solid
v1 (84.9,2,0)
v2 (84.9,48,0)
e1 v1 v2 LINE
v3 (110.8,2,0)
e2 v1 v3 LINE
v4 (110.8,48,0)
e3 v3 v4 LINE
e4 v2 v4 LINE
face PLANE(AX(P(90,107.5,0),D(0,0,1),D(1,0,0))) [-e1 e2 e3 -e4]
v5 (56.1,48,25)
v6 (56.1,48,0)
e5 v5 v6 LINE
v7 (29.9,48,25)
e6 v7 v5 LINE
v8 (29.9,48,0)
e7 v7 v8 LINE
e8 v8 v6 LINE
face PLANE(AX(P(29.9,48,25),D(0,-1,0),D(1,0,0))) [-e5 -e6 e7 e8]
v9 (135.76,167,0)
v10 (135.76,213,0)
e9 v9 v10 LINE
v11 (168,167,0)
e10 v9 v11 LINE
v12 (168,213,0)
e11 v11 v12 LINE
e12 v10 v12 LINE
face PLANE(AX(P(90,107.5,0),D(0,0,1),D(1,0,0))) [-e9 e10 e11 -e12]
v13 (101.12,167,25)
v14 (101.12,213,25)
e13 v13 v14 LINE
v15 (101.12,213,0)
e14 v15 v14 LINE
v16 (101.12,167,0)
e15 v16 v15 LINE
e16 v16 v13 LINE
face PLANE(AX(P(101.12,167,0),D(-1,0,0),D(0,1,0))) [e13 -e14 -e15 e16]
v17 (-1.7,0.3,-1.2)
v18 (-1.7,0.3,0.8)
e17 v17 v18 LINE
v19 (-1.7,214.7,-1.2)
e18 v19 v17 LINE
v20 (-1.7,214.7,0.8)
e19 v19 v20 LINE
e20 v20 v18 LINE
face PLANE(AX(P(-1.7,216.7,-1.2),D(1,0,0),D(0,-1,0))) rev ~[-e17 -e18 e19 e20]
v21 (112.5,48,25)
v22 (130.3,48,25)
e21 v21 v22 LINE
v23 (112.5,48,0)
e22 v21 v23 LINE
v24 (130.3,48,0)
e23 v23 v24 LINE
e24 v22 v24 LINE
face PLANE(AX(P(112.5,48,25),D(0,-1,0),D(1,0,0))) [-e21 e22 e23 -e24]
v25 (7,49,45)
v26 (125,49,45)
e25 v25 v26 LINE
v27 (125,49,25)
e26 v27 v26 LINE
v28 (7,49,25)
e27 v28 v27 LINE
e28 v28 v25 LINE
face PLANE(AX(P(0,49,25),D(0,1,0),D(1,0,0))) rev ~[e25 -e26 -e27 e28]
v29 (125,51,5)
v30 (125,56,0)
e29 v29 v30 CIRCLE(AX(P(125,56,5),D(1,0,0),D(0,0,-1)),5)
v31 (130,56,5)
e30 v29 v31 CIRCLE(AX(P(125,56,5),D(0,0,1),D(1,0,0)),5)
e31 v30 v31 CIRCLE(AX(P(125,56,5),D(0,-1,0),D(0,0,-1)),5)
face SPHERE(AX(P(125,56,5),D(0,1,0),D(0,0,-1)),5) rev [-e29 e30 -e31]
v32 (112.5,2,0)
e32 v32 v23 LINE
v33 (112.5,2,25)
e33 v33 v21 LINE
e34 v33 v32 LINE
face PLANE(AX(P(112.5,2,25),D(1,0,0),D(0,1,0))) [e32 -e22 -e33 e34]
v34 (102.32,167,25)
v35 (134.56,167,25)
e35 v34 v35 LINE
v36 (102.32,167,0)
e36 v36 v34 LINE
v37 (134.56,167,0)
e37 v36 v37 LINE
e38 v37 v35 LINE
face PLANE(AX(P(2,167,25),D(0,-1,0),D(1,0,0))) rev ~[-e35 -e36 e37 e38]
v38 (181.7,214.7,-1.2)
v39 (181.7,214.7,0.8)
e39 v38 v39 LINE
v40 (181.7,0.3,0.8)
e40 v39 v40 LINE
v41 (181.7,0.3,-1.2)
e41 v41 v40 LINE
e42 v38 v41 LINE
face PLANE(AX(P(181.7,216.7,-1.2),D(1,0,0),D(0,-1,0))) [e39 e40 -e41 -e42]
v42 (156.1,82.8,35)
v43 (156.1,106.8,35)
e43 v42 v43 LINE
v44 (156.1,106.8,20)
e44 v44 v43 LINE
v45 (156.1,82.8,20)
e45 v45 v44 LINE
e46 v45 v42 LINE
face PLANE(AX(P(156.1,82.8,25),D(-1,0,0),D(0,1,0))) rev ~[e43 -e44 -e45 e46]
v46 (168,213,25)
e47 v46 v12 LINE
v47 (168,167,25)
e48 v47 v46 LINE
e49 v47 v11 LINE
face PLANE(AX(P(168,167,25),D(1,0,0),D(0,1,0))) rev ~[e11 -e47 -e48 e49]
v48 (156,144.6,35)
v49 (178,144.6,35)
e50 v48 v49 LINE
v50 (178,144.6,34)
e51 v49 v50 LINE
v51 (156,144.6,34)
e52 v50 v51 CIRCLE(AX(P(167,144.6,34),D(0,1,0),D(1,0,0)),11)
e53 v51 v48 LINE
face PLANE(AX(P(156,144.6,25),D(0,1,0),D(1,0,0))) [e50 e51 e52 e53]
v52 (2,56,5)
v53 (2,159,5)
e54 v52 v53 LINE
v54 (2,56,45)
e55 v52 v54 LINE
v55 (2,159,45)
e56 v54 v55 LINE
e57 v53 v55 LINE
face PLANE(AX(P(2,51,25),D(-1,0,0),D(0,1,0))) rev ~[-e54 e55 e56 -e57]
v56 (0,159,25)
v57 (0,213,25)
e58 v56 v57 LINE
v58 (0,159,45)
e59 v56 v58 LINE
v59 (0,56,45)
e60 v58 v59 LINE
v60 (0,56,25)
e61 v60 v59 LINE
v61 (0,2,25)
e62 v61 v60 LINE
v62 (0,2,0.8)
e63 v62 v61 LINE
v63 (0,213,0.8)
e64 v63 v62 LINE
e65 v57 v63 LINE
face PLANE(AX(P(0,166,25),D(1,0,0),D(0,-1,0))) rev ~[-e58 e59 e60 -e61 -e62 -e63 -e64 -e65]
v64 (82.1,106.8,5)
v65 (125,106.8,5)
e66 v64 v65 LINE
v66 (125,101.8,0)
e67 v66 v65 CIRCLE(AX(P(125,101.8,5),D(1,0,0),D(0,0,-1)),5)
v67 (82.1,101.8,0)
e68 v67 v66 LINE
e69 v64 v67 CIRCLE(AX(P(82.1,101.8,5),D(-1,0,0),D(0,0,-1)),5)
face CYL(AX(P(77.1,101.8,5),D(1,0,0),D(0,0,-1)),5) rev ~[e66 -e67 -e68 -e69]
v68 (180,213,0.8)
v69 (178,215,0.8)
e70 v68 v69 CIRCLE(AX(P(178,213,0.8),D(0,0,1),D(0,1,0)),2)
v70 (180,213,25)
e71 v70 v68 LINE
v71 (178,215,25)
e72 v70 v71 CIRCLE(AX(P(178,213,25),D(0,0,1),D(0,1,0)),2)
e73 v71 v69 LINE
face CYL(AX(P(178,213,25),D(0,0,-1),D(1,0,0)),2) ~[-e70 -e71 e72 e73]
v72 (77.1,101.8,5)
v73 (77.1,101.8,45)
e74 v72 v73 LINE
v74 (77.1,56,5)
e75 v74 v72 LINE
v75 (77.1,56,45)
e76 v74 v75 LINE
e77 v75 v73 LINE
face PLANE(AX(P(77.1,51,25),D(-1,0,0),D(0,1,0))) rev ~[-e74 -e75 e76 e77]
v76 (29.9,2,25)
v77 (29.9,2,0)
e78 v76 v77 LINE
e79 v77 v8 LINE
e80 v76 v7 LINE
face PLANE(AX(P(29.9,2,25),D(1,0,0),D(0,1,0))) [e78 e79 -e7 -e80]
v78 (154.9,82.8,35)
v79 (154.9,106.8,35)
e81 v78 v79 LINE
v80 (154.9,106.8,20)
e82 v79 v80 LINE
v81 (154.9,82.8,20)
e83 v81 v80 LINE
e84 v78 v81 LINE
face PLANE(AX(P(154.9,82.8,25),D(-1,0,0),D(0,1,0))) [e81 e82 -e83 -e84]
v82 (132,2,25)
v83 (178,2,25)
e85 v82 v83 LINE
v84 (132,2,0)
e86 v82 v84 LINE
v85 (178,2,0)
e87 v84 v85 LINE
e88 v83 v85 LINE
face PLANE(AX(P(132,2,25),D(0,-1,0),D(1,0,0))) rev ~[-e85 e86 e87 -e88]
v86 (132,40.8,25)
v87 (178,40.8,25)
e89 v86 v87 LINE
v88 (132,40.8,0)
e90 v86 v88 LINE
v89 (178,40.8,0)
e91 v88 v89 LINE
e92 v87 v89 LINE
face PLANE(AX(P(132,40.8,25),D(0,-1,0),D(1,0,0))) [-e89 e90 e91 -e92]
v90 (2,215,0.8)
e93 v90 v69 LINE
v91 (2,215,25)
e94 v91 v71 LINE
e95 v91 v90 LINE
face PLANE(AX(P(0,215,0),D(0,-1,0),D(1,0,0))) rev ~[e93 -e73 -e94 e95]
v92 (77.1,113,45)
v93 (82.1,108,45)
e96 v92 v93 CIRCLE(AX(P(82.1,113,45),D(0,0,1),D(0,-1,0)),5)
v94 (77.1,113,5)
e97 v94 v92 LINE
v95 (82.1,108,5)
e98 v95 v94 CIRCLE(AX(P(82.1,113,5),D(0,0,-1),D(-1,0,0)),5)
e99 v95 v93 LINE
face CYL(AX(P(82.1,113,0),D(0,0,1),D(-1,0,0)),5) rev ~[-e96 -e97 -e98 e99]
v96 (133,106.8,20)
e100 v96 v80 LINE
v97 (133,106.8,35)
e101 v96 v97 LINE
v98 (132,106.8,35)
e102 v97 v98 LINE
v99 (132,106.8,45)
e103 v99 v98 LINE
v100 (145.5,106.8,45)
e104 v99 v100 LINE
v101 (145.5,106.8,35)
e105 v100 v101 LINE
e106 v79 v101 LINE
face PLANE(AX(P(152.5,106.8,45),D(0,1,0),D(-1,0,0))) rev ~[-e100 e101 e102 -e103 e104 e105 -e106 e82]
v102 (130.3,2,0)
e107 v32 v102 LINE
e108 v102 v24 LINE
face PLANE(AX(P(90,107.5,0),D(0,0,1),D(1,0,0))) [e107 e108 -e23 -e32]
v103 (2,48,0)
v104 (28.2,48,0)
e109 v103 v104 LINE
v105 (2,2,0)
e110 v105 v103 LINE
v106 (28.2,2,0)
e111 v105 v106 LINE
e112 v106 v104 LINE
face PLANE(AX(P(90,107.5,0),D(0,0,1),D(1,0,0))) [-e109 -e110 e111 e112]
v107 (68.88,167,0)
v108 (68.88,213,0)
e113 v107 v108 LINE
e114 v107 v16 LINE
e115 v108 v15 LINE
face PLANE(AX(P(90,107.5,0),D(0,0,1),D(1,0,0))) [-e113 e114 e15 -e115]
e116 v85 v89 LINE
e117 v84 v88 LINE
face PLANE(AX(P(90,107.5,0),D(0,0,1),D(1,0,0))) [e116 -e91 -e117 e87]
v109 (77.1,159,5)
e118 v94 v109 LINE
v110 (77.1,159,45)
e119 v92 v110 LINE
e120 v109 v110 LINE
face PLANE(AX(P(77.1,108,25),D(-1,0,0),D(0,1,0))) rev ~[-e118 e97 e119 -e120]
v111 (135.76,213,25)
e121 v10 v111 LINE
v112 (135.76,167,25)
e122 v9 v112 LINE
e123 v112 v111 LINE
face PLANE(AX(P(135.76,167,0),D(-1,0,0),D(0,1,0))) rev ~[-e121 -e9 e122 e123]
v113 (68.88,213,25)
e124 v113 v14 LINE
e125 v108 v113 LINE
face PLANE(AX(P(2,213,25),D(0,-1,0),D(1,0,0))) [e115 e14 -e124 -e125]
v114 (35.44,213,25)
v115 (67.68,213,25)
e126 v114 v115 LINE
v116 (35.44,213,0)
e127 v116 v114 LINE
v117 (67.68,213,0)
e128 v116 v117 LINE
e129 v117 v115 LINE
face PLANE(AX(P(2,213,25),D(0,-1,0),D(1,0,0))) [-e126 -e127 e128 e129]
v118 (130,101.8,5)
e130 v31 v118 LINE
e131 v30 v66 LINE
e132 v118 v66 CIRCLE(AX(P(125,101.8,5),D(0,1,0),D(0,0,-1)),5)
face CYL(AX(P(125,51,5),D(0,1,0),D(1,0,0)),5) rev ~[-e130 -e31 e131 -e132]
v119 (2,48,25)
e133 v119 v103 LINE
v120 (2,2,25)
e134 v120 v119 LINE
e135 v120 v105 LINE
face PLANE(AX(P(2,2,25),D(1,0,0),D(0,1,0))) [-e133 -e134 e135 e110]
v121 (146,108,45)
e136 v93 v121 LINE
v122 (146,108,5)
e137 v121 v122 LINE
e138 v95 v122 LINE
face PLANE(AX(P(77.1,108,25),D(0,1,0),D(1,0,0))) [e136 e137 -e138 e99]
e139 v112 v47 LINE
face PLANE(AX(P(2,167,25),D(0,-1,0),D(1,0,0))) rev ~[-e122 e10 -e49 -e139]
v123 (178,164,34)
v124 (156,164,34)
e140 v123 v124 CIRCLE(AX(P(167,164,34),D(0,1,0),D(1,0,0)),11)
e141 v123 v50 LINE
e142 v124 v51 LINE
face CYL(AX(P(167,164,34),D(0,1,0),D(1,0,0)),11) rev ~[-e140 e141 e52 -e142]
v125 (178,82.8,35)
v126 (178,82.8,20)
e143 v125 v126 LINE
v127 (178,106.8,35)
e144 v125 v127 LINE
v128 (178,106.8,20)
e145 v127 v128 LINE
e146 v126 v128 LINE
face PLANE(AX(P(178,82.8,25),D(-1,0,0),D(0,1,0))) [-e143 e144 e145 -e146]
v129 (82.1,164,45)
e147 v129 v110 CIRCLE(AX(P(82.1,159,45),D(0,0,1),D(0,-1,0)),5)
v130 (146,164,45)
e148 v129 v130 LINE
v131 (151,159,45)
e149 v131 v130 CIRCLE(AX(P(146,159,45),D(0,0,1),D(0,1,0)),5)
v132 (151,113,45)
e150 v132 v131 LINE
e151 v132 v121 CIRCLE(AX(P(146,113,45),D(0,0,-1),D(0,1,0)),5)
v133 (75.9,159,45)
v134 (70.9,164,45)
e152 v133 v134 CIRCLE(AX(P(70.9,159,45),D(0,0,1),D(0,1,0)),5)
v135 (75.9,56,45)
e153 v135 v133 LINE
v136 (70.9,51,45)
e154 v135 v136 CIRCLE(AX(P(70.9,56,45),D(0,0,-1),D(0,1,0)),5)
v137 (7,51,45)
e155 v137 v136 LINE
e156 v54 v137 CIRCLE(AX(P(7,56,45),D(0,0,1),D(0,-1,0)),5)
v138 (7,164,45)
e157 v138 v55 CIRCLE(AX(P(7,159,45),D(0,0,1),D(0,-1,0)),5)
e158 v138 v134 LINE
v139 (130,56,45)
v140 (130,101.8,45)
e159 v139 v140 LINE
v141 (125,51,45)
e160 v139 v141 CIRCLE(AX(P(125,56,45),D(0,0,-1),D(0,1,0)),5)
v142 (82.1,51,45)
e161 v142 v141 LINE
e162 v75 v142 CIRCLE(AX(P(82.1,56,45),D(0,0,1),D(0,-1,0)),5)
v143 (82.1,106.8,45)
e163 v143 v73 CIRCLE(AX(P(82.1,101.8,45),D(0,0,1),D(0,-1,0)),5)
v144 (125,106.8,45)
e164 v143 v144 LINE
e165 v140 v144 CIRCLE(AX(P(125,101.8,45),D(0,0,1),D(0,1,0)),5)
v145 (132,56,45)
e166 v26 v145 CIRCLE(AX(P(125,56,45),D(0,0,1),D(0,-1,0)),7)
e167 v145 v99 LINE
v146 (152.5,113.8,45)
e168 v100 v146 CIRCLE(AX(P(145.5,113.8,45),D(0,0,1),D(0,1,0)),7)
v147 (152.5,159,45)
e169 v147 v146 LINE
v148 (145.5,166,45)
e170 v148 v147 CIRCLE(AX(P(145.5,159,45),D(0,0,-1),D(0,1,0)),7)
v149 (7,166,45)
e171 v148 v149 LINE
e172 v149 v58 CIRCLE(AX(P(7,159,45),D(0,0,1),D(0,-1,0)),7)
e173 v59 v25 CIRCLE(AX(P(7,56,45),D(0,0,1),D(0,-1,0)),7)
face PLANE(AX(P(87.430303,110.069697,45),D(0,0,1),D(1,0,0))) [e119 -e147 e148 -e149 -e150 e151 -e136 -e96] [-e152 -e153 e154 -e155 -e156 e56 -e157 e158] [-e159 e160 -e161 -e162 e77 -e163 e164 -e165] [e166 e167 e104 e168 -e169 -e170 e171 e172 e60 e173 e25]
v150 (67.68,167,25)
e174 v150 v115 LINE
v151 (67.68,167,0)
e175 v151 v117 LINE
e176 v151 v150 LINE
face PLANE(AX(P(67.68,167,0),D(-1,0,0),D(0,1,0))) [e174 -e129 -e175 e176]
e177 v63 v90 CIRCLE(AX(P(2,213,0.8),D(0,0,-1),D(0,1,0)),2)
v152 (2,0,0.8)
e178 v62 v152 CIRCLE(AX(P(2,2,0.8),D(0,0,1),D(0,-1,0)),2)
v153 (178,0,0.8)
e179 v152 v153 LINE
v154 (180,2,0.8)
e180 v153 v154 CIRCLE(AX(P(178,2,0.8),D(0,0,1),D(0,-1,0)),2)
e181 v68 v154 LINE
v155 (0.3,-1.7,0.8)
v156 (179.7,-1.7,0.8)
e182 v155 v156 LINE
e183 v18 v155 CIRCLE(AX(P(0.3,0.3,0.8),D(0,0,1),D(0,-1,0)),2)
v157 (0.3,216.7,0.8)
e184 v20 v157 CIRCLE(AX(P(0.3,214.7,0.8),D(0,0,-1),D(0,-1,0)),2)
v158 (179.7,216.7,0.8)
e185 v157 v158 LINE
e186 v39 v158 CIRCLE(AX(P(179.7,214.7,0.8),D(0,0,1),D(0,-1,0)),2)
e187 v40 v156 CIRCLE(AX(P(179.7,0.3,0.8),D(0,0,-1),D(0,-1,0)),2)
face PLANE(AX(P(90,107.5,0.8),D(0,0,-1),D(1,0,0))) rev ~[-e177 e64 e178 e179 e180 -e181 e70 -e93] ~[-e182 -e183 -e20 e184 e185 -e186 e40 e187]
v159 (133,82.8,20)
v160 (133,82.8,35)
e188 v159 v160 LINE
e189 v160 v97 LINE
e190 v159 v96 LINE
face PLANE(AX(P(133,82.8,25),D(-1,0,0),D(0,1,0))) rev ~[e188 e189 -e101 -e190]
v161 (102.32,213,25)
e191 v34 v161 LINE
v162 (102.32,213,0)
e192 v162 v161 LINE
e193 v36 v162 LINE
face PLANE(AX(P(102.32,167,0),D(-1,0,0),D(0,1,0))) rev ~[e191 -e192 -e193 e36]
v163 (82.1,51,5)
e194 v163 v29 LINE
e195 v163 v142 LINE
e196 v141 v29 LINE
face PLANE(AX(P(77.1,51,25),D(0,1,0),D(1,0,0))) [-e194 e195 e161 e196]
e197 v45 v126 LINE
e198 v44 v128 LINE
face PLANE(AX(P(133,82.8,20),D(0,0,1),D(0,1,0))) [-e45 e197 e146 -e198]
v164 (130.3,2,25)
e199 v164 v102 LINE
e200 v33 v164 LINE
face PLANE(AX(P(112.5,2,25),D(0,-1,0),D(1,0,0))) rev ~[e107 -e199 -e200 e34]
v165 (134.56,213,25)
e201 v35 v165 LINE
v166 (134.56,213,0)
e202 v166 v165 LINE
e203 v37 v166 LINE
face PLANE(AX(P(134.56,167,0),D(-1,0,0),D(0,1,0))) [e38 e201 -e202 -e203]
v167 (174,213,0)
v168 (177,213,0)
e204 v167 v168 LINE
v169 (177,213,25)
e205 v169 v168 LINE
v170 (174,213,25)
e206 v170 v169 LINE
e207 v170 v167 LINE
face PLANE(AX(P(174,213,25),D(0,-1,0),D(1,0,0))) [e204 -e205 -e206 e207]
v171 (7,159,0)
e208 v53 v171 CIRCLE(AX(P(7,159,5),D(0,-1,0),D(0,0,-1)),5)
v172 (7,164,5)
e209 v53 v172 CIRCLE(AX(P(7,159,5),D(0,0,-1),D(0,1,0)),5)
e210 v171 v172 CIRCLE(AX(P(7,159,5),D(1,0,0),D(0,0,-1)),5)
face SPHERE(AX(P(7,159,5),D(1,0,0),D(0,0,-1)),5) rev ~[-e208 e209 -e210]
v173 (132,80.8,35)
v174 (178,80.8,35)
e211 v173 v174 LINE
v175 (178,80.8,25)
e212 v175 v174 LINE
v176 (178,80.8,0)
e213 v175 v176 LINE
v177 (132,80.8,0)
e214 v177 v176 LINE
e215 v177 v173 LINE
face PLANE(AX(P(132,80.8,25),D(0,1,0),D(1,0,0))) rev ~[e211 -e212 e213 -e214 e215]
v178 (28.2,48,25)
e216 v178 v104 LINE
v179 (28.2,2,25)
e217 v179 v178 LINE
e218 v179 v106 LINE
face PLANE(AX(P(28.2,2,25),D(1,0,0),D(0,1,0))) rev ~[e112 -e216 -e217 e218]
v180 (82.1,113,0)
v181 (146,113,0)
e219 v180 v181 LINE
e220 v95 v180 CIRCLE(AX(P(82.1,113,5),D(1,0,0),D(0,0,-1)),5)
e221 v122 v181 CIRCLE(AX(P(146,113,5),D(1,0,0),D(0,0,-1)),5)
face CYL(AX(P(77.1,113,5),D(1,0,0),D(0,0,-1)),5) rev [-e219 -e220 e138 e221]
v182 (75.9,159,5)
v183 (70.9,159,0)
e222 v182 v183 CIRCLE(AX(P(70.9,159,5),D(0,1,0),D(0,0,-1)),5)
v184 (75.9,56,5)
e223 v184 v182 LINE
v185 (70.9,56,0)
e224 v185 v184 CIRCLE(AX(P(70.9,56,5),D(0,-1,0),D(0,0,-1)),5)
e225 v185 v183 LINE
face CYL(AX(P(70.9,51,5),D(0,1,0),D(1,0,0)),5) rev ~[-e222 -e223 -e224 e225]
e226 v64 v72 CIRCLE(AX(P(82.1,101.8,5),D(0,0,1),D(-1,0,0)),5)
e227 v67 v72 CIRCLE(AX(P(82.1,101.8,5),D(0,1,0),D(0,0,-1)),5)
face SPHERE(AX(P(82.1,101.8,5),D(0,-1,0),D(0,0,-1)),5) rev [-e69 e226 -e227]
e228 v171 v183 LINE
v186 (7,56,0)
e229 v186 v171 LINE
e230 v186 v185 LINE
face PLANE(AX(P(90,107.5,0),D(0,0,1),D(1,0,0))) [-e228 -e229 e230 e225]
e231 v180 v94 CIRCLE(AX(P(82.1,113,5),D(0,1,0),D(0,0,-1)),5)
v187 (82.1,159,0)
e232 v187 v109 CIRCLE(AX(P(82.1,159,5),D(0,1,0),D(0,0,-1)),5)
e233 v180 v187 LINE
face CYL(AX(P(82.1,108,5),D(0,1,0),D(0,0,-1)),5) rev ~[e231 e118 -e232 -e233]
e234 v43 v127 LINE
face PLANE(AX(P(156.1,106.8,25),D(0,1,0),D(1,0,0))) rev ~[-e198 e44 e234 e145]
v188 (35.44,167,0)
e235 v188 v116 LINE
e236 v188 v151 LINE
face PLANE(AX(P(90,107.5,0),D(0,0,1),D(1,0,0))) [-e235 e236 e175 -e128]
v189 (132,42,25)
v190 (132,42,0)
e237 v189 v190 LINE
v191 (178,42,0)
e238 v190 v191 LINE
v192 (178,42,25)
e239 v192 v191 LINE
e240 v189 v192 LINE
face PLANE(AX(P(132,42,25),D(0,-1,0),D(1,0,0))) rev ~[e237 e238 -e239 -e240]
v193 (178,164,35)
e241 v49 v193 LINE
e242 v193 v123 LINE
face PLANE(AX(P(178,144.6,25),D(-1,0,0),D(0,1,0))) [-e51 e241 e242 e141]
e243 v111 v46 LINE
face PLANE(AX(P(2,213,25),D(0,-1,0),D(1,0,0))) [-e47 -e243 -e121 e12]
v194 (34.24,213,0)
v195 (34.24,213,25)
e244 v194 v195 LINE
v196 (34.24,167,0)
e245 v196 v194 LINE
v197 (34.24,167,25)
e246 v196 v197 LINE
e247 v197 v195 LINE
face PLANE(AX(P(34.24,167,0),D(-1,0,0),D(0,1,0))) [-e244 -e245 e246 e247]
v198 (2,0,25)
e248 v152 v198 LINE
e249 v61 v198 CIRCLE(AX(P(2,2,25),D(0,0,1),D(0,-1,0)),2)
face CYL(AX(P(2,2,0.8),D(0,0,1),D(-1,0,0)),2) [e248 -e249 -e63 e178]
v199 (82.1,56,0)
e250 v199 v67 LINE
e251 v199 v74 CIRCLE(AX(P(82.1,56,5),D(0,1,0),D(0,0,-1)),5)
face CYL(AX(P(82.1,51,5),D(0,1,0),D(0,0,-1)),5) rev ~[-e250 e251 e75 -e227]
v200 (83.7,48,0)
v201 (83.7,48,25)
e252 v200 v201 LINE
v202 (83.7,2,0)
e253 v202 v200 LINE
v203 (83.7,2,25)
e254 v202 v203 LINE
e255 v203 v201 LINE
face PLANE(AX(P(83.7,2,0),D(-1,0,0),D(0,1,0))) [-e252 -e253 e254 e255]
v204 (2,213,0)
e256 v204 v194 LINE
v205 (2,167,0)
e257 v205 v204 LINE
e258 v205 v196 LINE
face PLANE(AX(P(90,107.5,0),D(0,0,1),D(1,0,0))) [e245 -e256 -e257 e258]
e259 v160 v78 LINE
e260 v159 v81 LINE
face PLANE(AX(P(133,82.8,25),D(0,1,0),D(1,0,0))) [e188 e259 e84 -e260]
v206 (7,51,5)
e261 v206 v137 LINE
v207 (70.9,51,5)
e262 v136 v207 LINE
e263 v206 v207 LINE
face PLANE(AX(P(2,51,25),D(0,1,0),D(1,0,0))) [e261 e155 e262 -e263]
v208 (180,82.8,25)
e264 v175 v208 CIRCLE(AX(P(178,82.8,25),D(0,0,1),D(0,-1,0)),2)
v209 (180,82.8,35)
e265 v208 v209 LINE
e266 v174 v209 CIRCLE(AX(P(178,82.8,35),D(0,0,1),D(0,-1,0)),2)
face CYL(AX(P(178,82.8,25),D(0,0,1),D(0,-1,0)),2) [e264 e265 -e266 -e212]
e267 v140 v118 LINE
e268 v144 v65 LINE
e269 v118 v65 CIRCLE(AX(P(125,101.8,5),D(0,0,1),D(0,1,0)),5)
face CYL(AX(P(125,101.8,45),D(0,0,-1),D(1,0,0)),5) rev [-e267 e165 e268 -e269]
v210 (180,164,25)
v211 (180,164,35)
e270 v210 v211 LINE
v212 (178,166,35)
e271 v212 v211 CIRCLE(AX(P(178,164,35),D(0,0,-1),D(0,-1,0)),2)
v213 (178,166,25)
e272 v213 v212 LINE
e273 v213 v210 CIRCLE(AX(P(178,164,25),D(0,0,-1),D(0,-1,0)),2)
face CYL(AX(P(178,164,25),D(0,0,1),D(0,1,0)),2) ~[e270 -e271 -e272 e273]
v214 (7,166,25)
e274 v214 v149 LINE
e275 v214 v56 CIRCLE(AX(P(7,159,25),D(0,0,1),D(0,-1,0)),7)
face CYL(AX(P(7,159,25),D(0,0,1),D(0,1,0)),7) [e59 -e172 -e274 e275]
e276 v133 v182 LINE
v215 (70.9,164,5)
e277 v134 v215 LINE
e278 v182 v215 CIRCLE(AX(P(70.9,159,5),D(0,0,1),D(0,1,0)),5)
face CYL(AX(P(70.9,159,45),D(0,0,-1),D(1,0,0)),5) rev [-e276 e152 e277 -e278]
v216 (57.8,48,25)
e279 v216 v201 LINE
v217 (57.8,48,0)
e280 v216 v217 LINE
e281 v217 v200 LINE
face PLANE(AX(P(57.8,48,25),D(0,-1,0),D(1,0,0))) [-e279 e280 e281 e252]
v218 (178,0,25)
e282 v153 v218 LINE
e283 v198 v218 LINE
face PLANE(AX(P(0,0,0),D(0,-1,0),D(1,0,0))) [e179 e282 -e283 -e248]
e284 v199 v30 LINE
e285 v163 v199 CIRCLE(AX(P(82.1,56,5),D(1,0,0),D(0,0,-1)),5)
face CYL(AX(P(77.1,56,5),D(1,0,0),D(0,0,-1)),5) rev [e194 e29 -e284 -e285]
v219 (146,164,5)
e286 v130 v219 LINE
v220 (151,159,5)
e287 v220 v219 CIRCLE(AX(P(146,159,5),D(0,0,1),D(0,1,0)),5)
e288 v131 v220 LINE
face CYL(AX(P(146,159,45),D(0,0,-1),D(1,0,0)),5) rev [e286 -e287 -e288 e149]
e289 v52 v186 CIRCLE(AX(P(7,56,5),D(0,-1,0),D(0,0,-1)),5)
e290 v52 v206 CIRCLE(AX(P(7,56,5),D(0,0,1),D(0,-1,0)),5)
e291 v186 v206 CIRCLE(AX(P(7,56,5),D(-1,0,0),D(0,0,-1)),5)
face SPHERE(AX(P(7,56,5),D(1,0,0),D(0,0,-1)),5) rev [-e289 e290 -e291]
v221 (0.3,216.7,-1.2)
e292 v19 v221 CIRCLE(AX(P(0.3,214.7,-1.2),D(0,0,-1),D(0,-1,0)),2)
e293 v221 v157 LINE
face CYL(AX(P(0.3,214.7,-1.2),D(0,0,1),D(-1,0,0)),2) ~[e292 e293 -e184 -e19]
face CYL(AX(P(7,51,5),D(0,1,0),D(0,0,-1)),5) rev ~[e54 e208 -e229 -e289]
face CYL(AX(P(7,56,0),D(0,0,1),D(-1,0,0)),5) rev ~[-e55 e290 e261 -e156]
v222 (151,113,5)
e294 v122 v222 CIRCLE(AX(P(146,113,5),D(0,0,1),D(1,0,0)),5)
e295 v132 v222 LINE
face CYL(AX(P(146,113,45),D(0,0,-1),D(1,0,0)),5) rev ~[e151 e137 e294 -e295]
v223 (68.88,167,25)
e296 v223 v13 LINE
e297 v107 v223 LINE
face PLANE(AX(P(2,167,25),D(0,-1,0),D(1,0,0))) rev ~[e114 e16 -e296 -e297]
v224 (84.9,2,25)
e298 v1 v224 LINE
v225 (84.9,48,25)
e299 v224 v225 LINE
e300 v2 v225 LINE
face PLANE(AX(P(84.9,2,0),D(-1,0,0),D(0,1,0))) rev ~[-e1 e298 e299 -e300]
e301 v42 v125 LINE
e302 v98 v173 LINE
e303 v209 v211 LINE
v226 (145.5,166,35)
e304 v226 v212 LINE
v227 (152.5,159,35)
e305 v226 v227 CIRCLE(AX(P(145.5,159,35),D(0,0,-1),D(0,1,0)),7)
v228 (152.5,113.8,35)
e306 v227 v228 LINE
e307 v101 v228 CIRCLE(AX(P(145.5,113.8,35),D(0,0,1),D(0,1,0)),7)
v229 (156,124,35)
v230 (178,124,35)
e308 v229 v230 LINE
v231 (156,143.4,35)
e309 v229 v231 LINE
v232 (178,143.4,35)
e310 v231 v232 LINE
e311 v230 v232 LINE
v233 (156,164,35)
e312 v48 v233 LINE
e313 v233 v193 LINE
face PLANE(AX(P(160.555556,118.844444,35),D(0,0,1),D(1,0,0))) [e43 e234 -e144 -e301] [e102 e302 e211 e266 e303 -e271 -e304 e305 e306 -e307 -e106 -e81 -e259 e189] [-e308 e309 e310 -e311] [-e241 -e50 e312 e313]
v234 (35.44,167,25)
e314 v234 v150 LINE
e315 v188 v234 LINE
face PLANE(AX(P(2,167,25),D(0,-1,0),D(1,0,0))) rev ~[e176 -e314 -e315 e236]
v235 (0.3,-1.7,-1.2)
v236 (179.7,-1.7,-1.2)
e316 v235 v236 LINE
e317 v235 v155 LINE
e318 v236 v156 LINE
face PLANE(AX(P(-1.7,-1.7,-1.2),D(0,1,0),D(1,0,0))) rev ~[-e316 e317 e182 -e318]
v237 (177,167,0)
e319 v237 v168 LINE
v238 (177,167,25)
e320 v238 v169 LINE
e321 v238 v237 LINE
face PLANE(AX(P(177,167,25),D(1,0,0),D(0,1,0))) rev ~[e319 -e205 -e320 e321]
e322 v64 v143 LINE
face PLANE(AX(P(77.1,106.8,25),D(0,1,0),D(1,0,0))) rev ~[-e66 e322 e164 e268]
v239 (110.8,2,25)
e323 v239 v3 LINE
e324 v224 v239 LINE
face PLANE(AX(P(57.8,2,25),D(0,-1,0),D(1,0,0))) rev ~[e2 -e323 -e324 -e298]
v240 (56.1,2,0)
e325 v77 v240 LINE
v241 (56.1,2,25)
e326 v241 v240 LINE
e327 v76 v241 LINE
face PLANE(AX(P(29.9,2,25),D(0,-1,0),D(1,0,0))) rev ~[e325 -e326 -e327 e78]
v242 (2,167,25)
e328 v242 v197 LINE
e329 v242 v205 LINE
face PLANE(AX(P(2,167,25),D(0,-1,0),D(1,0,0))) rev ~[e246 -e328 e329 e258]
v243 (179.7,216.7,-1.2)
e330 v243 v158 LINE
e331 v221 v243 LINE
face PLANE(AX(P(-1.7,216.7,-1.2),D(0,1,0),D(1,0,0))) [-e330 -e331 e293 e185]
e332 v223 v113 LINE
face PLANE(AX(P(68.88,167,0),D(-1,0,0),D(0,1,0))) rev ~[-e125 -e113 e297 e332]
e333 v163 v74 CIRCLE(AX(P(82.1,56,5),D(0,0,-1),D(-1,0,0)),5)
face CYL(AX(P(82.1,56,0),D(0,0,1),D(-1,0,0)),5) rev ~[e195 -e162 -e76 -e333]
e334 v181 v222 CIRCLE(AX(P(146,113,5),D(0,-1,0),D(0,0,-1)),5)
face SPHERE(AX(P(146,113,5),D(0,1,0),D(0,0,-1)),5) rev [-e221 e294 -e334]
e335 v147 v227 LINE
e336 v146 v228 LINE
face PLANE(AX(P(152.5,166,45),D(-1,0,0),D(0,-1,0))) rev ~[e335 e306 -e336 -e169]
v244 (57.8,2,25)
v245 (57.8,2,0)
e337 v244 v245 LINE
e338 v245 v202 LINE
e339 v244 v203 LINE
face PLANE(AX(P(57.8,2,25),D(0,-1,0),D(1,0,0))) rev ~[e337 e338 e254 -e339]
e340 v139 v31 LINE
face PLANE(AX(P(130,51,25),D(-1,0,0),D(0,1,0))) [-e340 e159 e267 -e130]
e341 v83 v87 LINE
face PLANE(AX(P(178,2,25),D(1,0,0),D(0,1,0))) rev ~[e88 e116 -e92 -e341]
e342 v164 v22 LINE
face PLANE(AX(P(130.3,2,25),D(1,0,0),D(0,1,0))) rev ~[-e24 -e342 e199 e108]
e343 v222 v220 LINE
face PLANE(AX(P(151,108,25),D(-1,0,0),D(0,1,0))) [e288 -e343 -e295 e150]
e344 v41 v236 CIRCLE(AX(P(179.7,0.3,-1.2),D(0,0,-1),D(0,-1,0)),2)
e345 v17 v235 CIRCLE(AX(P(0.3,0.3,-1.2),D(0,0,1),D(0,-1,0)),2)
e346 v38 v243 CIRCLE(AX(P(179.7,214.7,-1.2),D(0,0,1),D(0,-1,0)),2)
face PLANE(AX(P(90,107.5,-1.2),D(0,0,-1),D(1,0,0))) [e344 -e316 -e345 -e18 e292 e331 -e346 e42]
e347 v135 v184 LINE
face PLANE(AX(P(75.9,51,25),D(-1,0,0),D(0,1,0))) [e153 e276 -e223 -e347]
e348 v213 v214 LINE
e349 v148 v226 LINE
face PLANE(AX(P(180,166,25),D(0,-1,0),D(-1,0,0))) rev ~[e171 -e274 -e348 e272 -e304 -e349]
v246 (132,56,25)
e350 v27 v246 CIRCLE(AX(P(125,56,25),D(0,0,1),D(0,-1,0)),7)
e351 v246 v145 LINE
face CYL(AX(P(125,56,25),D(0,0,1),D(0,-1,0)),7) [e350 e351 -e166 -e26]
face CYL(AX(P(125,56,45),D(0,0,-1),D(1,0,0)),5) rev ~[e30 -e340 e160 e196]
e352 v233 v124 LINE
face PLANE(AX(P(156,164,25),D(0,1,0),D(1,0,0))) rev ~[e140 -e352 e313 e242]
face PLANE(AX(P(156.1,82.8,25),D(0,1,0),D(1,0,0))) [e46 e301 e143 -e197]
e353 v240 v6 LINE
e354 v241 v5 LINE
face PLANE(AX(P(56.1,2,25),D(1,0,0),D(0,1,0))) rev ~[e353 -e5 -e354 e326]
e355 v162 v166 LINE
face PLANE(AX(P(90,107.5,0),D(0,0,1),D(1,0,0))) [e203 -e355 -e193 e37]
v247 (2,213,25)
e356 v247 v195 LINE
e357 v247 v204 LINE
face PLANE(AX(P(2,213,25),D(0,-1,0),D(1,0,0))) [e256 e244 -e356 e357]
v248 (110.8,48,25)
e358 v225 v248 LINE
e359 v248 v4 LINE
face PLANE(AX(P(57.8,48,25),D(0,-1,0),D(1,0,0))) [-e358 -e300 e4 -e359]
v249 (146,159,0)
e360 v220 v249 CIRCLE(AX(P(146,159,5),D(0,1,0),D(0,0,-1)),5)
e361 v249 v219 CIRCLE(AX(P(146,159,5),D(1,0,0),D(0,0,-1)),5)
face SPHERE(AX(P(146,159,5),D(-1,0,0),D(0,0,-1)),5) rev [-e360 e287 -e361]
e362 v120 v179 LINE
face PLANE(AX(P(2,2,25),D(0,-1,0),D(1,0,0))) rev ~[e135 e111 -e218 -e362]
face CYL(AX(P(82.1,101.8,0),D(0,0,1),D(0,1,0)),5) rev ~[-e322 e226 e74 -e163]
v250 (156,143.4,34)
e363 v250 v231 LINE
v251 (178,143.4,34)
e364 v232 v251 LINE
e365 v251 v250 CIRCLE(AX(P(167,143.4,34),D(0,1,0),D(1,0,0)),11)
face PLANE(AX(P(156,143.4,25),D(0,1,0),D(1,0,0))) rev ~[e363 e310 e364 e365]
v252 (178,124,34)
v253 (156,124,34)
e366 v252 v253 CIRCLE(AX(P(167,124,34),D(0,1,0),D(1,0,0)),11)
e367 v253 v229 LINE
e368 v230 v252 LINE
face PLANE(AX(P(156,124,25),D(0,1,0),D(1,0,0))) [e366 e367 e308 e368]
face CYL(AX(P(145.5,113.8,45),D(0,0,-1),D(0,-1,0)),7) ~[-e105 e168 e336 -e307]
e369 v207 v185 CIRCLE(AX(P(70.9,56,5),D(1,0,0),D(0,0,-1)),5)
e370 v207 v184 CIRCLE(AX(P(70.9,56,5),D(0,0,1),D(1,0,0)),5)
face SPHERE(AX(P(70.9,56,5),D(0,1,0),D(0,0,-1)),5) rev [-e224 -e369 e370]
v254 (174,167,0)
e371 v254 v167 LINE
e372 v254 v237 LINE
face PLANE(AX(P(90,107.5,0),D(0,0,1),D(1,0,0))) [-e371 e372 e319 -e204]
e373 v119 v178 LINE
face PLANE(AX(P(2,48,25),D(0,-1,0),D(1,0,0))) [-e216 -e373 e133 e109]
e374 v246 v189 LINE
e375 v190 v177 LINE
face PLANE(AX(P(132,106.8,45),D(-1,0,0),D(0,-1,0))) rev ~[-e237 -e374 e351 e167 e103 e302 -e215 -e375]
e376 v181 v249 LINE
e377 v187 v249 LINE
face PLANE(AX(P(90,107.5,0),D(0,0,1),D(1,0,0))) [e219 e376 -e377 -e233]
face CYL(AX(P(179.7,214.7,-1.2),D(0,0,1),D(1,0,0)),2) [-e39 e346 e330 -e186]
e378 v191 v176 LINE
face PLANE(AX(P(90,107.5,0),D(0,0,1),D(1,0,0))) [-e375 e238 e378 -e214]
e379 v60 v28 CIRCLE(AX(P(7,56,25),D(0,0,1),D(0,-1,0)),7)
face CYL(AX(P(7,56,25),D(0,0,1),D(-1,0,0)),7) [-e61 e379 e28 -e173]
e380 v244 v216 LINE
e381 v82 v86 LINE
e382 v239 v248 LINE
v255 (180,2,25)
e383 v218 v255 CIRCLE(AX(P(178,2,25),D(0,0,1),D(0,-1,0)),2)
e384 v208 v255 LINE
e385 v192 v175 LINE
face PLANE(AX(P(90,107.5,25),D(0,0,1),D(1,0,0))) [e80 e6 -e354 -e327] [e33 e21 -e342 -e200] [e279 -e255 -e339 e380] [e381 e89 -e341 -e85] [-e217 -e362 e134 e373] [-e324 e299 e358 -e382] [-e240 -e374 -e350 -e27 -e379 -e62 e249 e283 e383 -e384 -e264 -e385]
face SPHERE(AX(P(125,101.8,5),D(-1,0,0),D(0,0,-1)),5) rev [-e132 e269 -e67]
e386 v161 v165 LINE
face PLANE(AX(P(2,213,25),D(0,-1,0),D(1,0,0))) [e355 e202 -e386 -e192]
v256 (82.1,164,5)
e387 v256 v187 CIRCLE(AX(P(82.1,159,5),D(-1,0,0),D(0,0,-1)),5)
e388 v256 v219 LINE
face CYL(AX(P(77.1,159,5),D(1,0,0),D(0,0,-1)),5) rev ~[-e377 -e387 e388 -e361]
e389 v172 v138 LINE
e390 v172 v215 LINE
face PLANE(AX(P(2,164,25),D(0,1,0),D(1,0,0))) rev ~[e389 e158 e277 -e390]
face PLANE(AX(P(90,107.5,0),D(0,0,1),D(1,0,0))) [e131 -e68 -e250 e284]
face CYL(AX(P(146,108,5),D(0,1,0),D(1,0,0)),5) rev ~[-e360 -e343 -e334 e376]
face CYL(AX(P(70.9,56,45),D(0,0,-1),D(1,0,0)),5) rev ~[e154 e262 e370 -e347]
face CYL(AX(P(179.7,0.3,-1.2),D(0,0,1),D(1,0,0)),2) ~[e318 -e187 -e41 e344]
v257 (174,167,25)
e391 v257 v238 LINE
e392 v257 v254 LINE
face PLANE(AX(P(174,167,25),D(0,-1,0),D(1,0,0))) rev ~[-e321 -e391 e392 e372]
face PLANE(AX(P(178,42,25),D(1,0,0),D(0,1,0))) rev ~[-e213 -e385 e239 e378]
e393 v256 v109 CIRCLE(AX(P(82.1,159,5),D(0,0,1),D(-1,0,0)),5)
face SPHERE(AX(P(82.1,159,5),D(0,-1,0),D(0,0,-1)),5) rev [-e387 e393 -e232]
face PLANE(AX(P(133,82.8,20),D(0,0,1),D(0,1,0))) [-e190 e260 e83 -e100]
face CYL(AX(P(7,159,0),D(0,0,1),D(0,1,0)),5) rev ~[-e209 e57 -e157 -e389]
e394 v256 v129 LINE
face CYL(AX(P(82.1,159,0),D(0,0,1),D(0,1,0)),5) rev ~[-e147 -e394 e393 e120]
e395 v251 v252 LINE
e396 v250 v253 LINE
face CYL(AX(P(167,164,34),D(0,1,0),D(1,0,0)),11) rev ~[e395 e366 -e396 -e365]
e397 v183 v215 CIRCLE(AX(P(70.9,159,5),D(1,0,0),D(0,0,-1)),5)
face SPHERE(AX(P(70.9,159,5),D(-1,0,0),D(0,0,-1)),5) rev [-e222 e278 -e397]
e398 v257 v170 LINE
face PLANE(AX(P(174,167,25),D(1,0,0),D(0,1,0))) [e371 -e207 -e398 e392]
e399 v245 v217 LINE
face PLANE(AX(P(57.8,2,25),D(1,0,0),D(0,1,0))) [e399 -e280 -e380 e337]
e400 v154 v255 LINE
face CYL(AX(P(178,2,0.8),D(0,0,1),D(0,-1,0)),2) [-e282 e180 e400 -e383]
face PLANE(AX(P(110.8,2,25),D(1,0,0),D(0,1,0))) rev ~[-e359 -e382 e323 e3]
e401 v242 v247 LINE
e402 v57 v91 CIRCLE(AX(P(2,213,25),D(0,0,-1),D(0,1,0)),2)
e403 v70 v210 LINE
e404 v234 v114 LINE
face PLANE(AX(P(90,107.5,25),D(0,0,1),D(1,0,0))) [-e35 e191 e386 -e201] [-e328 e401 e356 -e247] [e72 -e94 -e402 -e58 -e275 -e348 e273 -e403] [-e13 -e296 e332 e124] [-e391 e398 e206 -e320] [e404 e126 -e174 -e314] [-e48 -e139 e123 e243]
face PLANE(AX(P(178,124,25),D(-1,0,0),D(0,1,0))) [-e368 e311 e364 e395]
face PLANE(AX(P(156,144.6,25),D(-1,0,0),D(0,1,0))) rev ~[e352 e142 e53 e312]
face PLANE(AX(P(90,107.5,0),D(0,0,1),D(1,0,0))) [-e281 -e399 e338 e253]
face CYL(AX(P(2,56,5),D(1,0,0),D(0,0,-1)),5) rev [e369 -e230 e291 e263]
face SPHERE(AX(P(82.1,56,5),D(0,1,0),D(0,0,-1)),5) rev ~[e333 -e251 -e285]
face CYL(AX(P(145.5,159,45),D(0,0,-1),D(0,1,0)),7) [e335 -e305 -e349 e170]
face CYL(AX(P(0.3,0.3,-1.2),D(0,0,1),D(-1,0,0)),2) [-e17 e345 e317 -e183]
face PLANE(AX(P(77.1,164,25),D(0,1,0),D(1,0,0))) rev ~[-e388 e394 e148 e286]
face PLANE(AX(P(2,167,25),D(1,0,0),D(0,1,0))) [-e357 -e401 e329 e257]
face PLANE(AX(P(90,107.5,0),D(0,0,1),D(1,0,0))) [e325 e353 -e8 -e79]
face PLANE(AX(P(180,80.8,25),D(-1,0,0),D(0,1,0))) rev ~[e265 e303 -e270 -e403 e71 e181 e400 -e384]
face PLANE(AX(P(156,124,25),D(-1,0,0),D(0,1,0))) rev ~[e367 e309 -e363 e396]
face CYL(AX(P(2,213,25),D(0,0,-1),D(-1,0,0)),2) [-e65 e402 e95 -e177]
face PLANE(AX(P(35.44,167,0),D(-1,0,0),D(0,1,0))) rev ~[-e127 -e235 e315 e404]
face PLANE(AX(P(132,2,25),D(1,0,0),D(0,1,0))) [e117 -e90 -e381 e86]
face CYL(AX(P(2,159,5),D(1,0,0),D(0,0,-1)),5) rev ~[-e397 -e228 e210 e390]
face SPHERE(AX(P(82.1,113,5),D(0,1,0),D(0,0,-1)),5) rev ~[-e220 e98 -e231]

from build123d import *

# Parameters (mm, degrees)
F0_W      = 180
F0_H      = 215
F1_DEPTH  = 25
F2_W      = 166
F2_H      = 46
F2_W_2    = 53
F2_W_3    = 26.2
F2_W_4    = 46
F2_H_2    = 38.8
F2_W_5    = 52.9
F2_H_3    = 55.8
F2_W_6    = 45
F2_H_4    = 24
F2_W_7    = 22
F2_H_5    = 40
F2_W_8    = 73.9
F2_H_6    = 56
F2_H_7    = 113
F2_W_9    = 17.8
F2_W_10   = 3
F3_DEPTH  = 25.001
F4_W      = 180
F4_H      = 215
F5_DEPTH  = 1.2
F6_W      = 1.2
F6_H      = 46
F6_W_2    = 22
F6_H_2    = 1.2
F6_H_3    = 24
F7_DEPTH  = 25
F8_W      = 52.9
F8_H      = 55.8
F8_W_2    = 21.9
F8_H_2    = 24
F8_W_3    = 73.9
F8_H_3    = 113
F8_H_4    = 56
F8_W_4    = 22
F8_H_5    = 19.4
F9_DEPTH  = 20
F10_W     = 24
F10_H     = 20
F11_DEPTH = 45
F13_DEPTH = 40
F14_W     = 183.4
F14_H     = 218.4
F14_W_2   = 180
F14_H_2   = 215
F15_DEPTH = 2
F17_DEPTH = 10
F18_R     = 2
F19_R     = 5
F20_R     = 7


with BuildPart() as f1:
    # F0 (on Top) → F1 (new body)
    with BuildSketch(Plane.XY):
        with Locations((90, 107.5)):
            Rectangle(F0_W, F0_H)
    extrude(amount=F1_DEPTH)

    # F2 (on face) → F3 (cut, through all)
    with BuildSketch(Plane.XY.offset(25)):
        with Locations((85, 190)):
            Rectangle(F2_W, F2_H)
        with Locations((84.3, 25)):
            Rectangle(F2_W_2, F2_H)
        with Locations((15.1, 25)):
            Rectangle(F2_W_3, F2_H)
        with Locations((155, 21.4)):
            Rectangle(F2_W_4, F2_H_2)
        with Locations((155, 61.4)):
            Rectangle(F2_W_4, F2_H_2)
        with Locations((43, 25)):
            Rectangle(F2_W_3, F2_H)
        with Locations((103.55, 78.9)):
            Rectangle(F2_W_5, F2_H_3)
        with Locations((155.5, 94.8)):
            Rectangle(F2_W_6, F2_H_4)
        with Locations((167, 144)):
            Rectangle(F2_W_7, F2_H_5)
        with Locations((114.05, 136)):
            Rectangle(F2_W_8, F2_H_6)
        with Locations((38.95, 107.5)):
            Rectangle(F2_W_8, F2_H_7)
        with Locations((121.4, 25)):
            Rectangle(F2_W_9, F2_H)
        with Locations((175.5, 190)):
            Rectangle(F2_W_10, F2_H)
    extrude(amount=-F3_DEPTH, mode=Mode.SUBTRACT)

    # F4 (on Top) → F5 (join)
    with BuildSketch(Plane.XY):
        with Locations((90, 107.5)):
            Rectangle(F4_W, F4_H)
    extrude(amount=-F5_DEPTH)

    # F6 (on Top) → F7 (join, through all)
    with BuildSketch(Plane.XY):
        with Locations((34.84, 190)):
            Rectangle(F6_W, F6_H)
        with Locations((68.28, 190)):
            Rectangle(F6_W, F6_H)
        with Locations((101.72, 190)):
            Rectangle(F6_W, F6_H)
        with Locations((135.16, 190)):
            Rectangle(F6_W, F6_H)
        with Locations((84.3, 25)):
            Rectangle(F6_W, F6_H)
        with Locations((167, 144)):
            Rectangle(F6_W_2, F6_H_2)
        with Locations((155.5, 94.8)):
            Rectangle(F6_W, F6_H_3)
    extrude(amount=F7_DEPTH)

    # F8 (on face) → F9 (join)
    with BuildSketch(Plane.XY.offset(25)):
        Polygon((0, 166), (0, 49), (132, 49), (132, 80.8), (180, 80.8), (180, 166), (132, 166), align=None)
        with Locations((103.55, 78.9)):
            Rectangle(F8_W, F8_H, mode=Mode.SUBTRACT)
        with Locations((143.95, 94.8)):
            Rectangle(F8_W_2, F8_H_2, mode=Mode.SUBTRACT)
        with Locations((167.05, 94.8)):
            Rectangle(F8_W_2, F8_H_2, mode=Mode.SUBTRACT)
        with Locations((38.95, 107.5)):
            Rectangle(F8_W_3, F8_H_3, mode=Mode.SUBTRACT)
        with Locations((114.05, 136)):
            Rectangle(F8_W_3, F8_H_4, mode=Mode.SUBTRACT)
        with Locations((167, 133.7)):
            Rectangle(F8_W_4, F8_H_5, mode=Mode.SUBTRACT)
        with Locations((167, 154.3)):
            Rectangle(F8_W_4, F8_H_5, mode=Mode.SUBTRACT)
    extrude(amount=F9_DEPTH)

    # F10 (on face) → F11 (join, through all)
    with BuildSketch(Plane.YZ.offset(133)):
        with Locations((94.8, 10)):
            Rectangle(F10_W, F10_H)
    extrude(amount=F11_DEPTH)

    # F12 (on face) → F13 (join, through all)
    with BuildSketch(Plane.XZ.offset(-164)):
        with BuildLine():
            Line((156, 34), (156, 0))
            Line((156, 0), (178, 0))
            Line((178, 0), (178, 34))
            ThreePointArc((178, 34), (167, 23), (156, 34))
        make_face()
    extrude(amount=F13_DEPTH)

    # F14 (on face) → F15 (join)
    with BuildSketch(Plane(origin=(0, 0, -1.2), x_dir=(1, 0, 0), z_dir=(0, 0, -1))):
        with Locations((90, -107.5)):
            Rectangle(F14_W, F14_H)
        with Locations((90, -107.5)):
            Rectangle(F14_W_2, F14_H_2, mode=Mode.SUBTRACT)
    extrude(amount=-F15_DEPTH)

    # F16 (on face) → F17 (cut)
    with BuildSketch(Plane.XY.offset(45)):
        Polygon((132, 106.8), (132, 80.8), (180, 80.8), (180, 166), (152.5, 166), (152.5, 106.8), align=None)
    extrude(amount=-F17_DEPTH, mode=Mode.SUBTRACT)

    # F18
    f18_edges = [f1.edges().sort_by_distance(p)[0] for p in [
        (180, 0, 12.9),
        (180, 80.8, 30),
        (180, 166, 30),
        (180, 215, 12.9),
        (0, 215, 12.9),
        (0, 0, 12.9),
        (-1.7, -1.7, -0.2),
        (181.7, -1.7, -0.2),
        (181.7, 216.7, -0.2),
        (-1.7, 216.7, -0.2),
    ]]
    fillet(f18_edges, radius=F18_R)

    # F19
    f19_edges = [f1.edges().sort_by_distance(p)[0] for p in [
        (77.1, 78.9, 0),
        (103.55, 106.8, 0),
        (130, 78.9, 0),
        (103.55, 51, 0),
        (77.1, 136, 0),
        (114.05, 164, 0),
        (151, 136, 0),
        (114.05, 108, 0),
        (38.95, 164, 0),
        (75.9, 107.5, 0),
        (38.95, 51, 0),
        (2, 107.5, 0),
        (2, 51, 22.5),
        (2, 164, 22.5),
        (75.9, 164, 22.5),
        (75.9, 51, 22.5),
        (77.1, 106.8, 22.5),
        (77.1, 164, 22.5),
        (151, 164, 22.5),
        (151, 108, 22.5),
        (130, 106.8, 22.5),
        (130, 51, 22.5),
        (77.1, 51, 22.5),
        (77.1, 108, 22.5),
    ]]
    fillet(f19_edges, radius=F19_R)

    # F20
    f20_edges = [f1.edges().sort_by_distance(p)[0] for p in [
        (132, 49, 35),
        (0, 49, 35),
        (152.5, 106.8, 40),
        (152.5, 166, 40),
        (0, 166, 35),
    ]]
    fillet(f20_edges, radius=F20_R)


solid = f1.part
